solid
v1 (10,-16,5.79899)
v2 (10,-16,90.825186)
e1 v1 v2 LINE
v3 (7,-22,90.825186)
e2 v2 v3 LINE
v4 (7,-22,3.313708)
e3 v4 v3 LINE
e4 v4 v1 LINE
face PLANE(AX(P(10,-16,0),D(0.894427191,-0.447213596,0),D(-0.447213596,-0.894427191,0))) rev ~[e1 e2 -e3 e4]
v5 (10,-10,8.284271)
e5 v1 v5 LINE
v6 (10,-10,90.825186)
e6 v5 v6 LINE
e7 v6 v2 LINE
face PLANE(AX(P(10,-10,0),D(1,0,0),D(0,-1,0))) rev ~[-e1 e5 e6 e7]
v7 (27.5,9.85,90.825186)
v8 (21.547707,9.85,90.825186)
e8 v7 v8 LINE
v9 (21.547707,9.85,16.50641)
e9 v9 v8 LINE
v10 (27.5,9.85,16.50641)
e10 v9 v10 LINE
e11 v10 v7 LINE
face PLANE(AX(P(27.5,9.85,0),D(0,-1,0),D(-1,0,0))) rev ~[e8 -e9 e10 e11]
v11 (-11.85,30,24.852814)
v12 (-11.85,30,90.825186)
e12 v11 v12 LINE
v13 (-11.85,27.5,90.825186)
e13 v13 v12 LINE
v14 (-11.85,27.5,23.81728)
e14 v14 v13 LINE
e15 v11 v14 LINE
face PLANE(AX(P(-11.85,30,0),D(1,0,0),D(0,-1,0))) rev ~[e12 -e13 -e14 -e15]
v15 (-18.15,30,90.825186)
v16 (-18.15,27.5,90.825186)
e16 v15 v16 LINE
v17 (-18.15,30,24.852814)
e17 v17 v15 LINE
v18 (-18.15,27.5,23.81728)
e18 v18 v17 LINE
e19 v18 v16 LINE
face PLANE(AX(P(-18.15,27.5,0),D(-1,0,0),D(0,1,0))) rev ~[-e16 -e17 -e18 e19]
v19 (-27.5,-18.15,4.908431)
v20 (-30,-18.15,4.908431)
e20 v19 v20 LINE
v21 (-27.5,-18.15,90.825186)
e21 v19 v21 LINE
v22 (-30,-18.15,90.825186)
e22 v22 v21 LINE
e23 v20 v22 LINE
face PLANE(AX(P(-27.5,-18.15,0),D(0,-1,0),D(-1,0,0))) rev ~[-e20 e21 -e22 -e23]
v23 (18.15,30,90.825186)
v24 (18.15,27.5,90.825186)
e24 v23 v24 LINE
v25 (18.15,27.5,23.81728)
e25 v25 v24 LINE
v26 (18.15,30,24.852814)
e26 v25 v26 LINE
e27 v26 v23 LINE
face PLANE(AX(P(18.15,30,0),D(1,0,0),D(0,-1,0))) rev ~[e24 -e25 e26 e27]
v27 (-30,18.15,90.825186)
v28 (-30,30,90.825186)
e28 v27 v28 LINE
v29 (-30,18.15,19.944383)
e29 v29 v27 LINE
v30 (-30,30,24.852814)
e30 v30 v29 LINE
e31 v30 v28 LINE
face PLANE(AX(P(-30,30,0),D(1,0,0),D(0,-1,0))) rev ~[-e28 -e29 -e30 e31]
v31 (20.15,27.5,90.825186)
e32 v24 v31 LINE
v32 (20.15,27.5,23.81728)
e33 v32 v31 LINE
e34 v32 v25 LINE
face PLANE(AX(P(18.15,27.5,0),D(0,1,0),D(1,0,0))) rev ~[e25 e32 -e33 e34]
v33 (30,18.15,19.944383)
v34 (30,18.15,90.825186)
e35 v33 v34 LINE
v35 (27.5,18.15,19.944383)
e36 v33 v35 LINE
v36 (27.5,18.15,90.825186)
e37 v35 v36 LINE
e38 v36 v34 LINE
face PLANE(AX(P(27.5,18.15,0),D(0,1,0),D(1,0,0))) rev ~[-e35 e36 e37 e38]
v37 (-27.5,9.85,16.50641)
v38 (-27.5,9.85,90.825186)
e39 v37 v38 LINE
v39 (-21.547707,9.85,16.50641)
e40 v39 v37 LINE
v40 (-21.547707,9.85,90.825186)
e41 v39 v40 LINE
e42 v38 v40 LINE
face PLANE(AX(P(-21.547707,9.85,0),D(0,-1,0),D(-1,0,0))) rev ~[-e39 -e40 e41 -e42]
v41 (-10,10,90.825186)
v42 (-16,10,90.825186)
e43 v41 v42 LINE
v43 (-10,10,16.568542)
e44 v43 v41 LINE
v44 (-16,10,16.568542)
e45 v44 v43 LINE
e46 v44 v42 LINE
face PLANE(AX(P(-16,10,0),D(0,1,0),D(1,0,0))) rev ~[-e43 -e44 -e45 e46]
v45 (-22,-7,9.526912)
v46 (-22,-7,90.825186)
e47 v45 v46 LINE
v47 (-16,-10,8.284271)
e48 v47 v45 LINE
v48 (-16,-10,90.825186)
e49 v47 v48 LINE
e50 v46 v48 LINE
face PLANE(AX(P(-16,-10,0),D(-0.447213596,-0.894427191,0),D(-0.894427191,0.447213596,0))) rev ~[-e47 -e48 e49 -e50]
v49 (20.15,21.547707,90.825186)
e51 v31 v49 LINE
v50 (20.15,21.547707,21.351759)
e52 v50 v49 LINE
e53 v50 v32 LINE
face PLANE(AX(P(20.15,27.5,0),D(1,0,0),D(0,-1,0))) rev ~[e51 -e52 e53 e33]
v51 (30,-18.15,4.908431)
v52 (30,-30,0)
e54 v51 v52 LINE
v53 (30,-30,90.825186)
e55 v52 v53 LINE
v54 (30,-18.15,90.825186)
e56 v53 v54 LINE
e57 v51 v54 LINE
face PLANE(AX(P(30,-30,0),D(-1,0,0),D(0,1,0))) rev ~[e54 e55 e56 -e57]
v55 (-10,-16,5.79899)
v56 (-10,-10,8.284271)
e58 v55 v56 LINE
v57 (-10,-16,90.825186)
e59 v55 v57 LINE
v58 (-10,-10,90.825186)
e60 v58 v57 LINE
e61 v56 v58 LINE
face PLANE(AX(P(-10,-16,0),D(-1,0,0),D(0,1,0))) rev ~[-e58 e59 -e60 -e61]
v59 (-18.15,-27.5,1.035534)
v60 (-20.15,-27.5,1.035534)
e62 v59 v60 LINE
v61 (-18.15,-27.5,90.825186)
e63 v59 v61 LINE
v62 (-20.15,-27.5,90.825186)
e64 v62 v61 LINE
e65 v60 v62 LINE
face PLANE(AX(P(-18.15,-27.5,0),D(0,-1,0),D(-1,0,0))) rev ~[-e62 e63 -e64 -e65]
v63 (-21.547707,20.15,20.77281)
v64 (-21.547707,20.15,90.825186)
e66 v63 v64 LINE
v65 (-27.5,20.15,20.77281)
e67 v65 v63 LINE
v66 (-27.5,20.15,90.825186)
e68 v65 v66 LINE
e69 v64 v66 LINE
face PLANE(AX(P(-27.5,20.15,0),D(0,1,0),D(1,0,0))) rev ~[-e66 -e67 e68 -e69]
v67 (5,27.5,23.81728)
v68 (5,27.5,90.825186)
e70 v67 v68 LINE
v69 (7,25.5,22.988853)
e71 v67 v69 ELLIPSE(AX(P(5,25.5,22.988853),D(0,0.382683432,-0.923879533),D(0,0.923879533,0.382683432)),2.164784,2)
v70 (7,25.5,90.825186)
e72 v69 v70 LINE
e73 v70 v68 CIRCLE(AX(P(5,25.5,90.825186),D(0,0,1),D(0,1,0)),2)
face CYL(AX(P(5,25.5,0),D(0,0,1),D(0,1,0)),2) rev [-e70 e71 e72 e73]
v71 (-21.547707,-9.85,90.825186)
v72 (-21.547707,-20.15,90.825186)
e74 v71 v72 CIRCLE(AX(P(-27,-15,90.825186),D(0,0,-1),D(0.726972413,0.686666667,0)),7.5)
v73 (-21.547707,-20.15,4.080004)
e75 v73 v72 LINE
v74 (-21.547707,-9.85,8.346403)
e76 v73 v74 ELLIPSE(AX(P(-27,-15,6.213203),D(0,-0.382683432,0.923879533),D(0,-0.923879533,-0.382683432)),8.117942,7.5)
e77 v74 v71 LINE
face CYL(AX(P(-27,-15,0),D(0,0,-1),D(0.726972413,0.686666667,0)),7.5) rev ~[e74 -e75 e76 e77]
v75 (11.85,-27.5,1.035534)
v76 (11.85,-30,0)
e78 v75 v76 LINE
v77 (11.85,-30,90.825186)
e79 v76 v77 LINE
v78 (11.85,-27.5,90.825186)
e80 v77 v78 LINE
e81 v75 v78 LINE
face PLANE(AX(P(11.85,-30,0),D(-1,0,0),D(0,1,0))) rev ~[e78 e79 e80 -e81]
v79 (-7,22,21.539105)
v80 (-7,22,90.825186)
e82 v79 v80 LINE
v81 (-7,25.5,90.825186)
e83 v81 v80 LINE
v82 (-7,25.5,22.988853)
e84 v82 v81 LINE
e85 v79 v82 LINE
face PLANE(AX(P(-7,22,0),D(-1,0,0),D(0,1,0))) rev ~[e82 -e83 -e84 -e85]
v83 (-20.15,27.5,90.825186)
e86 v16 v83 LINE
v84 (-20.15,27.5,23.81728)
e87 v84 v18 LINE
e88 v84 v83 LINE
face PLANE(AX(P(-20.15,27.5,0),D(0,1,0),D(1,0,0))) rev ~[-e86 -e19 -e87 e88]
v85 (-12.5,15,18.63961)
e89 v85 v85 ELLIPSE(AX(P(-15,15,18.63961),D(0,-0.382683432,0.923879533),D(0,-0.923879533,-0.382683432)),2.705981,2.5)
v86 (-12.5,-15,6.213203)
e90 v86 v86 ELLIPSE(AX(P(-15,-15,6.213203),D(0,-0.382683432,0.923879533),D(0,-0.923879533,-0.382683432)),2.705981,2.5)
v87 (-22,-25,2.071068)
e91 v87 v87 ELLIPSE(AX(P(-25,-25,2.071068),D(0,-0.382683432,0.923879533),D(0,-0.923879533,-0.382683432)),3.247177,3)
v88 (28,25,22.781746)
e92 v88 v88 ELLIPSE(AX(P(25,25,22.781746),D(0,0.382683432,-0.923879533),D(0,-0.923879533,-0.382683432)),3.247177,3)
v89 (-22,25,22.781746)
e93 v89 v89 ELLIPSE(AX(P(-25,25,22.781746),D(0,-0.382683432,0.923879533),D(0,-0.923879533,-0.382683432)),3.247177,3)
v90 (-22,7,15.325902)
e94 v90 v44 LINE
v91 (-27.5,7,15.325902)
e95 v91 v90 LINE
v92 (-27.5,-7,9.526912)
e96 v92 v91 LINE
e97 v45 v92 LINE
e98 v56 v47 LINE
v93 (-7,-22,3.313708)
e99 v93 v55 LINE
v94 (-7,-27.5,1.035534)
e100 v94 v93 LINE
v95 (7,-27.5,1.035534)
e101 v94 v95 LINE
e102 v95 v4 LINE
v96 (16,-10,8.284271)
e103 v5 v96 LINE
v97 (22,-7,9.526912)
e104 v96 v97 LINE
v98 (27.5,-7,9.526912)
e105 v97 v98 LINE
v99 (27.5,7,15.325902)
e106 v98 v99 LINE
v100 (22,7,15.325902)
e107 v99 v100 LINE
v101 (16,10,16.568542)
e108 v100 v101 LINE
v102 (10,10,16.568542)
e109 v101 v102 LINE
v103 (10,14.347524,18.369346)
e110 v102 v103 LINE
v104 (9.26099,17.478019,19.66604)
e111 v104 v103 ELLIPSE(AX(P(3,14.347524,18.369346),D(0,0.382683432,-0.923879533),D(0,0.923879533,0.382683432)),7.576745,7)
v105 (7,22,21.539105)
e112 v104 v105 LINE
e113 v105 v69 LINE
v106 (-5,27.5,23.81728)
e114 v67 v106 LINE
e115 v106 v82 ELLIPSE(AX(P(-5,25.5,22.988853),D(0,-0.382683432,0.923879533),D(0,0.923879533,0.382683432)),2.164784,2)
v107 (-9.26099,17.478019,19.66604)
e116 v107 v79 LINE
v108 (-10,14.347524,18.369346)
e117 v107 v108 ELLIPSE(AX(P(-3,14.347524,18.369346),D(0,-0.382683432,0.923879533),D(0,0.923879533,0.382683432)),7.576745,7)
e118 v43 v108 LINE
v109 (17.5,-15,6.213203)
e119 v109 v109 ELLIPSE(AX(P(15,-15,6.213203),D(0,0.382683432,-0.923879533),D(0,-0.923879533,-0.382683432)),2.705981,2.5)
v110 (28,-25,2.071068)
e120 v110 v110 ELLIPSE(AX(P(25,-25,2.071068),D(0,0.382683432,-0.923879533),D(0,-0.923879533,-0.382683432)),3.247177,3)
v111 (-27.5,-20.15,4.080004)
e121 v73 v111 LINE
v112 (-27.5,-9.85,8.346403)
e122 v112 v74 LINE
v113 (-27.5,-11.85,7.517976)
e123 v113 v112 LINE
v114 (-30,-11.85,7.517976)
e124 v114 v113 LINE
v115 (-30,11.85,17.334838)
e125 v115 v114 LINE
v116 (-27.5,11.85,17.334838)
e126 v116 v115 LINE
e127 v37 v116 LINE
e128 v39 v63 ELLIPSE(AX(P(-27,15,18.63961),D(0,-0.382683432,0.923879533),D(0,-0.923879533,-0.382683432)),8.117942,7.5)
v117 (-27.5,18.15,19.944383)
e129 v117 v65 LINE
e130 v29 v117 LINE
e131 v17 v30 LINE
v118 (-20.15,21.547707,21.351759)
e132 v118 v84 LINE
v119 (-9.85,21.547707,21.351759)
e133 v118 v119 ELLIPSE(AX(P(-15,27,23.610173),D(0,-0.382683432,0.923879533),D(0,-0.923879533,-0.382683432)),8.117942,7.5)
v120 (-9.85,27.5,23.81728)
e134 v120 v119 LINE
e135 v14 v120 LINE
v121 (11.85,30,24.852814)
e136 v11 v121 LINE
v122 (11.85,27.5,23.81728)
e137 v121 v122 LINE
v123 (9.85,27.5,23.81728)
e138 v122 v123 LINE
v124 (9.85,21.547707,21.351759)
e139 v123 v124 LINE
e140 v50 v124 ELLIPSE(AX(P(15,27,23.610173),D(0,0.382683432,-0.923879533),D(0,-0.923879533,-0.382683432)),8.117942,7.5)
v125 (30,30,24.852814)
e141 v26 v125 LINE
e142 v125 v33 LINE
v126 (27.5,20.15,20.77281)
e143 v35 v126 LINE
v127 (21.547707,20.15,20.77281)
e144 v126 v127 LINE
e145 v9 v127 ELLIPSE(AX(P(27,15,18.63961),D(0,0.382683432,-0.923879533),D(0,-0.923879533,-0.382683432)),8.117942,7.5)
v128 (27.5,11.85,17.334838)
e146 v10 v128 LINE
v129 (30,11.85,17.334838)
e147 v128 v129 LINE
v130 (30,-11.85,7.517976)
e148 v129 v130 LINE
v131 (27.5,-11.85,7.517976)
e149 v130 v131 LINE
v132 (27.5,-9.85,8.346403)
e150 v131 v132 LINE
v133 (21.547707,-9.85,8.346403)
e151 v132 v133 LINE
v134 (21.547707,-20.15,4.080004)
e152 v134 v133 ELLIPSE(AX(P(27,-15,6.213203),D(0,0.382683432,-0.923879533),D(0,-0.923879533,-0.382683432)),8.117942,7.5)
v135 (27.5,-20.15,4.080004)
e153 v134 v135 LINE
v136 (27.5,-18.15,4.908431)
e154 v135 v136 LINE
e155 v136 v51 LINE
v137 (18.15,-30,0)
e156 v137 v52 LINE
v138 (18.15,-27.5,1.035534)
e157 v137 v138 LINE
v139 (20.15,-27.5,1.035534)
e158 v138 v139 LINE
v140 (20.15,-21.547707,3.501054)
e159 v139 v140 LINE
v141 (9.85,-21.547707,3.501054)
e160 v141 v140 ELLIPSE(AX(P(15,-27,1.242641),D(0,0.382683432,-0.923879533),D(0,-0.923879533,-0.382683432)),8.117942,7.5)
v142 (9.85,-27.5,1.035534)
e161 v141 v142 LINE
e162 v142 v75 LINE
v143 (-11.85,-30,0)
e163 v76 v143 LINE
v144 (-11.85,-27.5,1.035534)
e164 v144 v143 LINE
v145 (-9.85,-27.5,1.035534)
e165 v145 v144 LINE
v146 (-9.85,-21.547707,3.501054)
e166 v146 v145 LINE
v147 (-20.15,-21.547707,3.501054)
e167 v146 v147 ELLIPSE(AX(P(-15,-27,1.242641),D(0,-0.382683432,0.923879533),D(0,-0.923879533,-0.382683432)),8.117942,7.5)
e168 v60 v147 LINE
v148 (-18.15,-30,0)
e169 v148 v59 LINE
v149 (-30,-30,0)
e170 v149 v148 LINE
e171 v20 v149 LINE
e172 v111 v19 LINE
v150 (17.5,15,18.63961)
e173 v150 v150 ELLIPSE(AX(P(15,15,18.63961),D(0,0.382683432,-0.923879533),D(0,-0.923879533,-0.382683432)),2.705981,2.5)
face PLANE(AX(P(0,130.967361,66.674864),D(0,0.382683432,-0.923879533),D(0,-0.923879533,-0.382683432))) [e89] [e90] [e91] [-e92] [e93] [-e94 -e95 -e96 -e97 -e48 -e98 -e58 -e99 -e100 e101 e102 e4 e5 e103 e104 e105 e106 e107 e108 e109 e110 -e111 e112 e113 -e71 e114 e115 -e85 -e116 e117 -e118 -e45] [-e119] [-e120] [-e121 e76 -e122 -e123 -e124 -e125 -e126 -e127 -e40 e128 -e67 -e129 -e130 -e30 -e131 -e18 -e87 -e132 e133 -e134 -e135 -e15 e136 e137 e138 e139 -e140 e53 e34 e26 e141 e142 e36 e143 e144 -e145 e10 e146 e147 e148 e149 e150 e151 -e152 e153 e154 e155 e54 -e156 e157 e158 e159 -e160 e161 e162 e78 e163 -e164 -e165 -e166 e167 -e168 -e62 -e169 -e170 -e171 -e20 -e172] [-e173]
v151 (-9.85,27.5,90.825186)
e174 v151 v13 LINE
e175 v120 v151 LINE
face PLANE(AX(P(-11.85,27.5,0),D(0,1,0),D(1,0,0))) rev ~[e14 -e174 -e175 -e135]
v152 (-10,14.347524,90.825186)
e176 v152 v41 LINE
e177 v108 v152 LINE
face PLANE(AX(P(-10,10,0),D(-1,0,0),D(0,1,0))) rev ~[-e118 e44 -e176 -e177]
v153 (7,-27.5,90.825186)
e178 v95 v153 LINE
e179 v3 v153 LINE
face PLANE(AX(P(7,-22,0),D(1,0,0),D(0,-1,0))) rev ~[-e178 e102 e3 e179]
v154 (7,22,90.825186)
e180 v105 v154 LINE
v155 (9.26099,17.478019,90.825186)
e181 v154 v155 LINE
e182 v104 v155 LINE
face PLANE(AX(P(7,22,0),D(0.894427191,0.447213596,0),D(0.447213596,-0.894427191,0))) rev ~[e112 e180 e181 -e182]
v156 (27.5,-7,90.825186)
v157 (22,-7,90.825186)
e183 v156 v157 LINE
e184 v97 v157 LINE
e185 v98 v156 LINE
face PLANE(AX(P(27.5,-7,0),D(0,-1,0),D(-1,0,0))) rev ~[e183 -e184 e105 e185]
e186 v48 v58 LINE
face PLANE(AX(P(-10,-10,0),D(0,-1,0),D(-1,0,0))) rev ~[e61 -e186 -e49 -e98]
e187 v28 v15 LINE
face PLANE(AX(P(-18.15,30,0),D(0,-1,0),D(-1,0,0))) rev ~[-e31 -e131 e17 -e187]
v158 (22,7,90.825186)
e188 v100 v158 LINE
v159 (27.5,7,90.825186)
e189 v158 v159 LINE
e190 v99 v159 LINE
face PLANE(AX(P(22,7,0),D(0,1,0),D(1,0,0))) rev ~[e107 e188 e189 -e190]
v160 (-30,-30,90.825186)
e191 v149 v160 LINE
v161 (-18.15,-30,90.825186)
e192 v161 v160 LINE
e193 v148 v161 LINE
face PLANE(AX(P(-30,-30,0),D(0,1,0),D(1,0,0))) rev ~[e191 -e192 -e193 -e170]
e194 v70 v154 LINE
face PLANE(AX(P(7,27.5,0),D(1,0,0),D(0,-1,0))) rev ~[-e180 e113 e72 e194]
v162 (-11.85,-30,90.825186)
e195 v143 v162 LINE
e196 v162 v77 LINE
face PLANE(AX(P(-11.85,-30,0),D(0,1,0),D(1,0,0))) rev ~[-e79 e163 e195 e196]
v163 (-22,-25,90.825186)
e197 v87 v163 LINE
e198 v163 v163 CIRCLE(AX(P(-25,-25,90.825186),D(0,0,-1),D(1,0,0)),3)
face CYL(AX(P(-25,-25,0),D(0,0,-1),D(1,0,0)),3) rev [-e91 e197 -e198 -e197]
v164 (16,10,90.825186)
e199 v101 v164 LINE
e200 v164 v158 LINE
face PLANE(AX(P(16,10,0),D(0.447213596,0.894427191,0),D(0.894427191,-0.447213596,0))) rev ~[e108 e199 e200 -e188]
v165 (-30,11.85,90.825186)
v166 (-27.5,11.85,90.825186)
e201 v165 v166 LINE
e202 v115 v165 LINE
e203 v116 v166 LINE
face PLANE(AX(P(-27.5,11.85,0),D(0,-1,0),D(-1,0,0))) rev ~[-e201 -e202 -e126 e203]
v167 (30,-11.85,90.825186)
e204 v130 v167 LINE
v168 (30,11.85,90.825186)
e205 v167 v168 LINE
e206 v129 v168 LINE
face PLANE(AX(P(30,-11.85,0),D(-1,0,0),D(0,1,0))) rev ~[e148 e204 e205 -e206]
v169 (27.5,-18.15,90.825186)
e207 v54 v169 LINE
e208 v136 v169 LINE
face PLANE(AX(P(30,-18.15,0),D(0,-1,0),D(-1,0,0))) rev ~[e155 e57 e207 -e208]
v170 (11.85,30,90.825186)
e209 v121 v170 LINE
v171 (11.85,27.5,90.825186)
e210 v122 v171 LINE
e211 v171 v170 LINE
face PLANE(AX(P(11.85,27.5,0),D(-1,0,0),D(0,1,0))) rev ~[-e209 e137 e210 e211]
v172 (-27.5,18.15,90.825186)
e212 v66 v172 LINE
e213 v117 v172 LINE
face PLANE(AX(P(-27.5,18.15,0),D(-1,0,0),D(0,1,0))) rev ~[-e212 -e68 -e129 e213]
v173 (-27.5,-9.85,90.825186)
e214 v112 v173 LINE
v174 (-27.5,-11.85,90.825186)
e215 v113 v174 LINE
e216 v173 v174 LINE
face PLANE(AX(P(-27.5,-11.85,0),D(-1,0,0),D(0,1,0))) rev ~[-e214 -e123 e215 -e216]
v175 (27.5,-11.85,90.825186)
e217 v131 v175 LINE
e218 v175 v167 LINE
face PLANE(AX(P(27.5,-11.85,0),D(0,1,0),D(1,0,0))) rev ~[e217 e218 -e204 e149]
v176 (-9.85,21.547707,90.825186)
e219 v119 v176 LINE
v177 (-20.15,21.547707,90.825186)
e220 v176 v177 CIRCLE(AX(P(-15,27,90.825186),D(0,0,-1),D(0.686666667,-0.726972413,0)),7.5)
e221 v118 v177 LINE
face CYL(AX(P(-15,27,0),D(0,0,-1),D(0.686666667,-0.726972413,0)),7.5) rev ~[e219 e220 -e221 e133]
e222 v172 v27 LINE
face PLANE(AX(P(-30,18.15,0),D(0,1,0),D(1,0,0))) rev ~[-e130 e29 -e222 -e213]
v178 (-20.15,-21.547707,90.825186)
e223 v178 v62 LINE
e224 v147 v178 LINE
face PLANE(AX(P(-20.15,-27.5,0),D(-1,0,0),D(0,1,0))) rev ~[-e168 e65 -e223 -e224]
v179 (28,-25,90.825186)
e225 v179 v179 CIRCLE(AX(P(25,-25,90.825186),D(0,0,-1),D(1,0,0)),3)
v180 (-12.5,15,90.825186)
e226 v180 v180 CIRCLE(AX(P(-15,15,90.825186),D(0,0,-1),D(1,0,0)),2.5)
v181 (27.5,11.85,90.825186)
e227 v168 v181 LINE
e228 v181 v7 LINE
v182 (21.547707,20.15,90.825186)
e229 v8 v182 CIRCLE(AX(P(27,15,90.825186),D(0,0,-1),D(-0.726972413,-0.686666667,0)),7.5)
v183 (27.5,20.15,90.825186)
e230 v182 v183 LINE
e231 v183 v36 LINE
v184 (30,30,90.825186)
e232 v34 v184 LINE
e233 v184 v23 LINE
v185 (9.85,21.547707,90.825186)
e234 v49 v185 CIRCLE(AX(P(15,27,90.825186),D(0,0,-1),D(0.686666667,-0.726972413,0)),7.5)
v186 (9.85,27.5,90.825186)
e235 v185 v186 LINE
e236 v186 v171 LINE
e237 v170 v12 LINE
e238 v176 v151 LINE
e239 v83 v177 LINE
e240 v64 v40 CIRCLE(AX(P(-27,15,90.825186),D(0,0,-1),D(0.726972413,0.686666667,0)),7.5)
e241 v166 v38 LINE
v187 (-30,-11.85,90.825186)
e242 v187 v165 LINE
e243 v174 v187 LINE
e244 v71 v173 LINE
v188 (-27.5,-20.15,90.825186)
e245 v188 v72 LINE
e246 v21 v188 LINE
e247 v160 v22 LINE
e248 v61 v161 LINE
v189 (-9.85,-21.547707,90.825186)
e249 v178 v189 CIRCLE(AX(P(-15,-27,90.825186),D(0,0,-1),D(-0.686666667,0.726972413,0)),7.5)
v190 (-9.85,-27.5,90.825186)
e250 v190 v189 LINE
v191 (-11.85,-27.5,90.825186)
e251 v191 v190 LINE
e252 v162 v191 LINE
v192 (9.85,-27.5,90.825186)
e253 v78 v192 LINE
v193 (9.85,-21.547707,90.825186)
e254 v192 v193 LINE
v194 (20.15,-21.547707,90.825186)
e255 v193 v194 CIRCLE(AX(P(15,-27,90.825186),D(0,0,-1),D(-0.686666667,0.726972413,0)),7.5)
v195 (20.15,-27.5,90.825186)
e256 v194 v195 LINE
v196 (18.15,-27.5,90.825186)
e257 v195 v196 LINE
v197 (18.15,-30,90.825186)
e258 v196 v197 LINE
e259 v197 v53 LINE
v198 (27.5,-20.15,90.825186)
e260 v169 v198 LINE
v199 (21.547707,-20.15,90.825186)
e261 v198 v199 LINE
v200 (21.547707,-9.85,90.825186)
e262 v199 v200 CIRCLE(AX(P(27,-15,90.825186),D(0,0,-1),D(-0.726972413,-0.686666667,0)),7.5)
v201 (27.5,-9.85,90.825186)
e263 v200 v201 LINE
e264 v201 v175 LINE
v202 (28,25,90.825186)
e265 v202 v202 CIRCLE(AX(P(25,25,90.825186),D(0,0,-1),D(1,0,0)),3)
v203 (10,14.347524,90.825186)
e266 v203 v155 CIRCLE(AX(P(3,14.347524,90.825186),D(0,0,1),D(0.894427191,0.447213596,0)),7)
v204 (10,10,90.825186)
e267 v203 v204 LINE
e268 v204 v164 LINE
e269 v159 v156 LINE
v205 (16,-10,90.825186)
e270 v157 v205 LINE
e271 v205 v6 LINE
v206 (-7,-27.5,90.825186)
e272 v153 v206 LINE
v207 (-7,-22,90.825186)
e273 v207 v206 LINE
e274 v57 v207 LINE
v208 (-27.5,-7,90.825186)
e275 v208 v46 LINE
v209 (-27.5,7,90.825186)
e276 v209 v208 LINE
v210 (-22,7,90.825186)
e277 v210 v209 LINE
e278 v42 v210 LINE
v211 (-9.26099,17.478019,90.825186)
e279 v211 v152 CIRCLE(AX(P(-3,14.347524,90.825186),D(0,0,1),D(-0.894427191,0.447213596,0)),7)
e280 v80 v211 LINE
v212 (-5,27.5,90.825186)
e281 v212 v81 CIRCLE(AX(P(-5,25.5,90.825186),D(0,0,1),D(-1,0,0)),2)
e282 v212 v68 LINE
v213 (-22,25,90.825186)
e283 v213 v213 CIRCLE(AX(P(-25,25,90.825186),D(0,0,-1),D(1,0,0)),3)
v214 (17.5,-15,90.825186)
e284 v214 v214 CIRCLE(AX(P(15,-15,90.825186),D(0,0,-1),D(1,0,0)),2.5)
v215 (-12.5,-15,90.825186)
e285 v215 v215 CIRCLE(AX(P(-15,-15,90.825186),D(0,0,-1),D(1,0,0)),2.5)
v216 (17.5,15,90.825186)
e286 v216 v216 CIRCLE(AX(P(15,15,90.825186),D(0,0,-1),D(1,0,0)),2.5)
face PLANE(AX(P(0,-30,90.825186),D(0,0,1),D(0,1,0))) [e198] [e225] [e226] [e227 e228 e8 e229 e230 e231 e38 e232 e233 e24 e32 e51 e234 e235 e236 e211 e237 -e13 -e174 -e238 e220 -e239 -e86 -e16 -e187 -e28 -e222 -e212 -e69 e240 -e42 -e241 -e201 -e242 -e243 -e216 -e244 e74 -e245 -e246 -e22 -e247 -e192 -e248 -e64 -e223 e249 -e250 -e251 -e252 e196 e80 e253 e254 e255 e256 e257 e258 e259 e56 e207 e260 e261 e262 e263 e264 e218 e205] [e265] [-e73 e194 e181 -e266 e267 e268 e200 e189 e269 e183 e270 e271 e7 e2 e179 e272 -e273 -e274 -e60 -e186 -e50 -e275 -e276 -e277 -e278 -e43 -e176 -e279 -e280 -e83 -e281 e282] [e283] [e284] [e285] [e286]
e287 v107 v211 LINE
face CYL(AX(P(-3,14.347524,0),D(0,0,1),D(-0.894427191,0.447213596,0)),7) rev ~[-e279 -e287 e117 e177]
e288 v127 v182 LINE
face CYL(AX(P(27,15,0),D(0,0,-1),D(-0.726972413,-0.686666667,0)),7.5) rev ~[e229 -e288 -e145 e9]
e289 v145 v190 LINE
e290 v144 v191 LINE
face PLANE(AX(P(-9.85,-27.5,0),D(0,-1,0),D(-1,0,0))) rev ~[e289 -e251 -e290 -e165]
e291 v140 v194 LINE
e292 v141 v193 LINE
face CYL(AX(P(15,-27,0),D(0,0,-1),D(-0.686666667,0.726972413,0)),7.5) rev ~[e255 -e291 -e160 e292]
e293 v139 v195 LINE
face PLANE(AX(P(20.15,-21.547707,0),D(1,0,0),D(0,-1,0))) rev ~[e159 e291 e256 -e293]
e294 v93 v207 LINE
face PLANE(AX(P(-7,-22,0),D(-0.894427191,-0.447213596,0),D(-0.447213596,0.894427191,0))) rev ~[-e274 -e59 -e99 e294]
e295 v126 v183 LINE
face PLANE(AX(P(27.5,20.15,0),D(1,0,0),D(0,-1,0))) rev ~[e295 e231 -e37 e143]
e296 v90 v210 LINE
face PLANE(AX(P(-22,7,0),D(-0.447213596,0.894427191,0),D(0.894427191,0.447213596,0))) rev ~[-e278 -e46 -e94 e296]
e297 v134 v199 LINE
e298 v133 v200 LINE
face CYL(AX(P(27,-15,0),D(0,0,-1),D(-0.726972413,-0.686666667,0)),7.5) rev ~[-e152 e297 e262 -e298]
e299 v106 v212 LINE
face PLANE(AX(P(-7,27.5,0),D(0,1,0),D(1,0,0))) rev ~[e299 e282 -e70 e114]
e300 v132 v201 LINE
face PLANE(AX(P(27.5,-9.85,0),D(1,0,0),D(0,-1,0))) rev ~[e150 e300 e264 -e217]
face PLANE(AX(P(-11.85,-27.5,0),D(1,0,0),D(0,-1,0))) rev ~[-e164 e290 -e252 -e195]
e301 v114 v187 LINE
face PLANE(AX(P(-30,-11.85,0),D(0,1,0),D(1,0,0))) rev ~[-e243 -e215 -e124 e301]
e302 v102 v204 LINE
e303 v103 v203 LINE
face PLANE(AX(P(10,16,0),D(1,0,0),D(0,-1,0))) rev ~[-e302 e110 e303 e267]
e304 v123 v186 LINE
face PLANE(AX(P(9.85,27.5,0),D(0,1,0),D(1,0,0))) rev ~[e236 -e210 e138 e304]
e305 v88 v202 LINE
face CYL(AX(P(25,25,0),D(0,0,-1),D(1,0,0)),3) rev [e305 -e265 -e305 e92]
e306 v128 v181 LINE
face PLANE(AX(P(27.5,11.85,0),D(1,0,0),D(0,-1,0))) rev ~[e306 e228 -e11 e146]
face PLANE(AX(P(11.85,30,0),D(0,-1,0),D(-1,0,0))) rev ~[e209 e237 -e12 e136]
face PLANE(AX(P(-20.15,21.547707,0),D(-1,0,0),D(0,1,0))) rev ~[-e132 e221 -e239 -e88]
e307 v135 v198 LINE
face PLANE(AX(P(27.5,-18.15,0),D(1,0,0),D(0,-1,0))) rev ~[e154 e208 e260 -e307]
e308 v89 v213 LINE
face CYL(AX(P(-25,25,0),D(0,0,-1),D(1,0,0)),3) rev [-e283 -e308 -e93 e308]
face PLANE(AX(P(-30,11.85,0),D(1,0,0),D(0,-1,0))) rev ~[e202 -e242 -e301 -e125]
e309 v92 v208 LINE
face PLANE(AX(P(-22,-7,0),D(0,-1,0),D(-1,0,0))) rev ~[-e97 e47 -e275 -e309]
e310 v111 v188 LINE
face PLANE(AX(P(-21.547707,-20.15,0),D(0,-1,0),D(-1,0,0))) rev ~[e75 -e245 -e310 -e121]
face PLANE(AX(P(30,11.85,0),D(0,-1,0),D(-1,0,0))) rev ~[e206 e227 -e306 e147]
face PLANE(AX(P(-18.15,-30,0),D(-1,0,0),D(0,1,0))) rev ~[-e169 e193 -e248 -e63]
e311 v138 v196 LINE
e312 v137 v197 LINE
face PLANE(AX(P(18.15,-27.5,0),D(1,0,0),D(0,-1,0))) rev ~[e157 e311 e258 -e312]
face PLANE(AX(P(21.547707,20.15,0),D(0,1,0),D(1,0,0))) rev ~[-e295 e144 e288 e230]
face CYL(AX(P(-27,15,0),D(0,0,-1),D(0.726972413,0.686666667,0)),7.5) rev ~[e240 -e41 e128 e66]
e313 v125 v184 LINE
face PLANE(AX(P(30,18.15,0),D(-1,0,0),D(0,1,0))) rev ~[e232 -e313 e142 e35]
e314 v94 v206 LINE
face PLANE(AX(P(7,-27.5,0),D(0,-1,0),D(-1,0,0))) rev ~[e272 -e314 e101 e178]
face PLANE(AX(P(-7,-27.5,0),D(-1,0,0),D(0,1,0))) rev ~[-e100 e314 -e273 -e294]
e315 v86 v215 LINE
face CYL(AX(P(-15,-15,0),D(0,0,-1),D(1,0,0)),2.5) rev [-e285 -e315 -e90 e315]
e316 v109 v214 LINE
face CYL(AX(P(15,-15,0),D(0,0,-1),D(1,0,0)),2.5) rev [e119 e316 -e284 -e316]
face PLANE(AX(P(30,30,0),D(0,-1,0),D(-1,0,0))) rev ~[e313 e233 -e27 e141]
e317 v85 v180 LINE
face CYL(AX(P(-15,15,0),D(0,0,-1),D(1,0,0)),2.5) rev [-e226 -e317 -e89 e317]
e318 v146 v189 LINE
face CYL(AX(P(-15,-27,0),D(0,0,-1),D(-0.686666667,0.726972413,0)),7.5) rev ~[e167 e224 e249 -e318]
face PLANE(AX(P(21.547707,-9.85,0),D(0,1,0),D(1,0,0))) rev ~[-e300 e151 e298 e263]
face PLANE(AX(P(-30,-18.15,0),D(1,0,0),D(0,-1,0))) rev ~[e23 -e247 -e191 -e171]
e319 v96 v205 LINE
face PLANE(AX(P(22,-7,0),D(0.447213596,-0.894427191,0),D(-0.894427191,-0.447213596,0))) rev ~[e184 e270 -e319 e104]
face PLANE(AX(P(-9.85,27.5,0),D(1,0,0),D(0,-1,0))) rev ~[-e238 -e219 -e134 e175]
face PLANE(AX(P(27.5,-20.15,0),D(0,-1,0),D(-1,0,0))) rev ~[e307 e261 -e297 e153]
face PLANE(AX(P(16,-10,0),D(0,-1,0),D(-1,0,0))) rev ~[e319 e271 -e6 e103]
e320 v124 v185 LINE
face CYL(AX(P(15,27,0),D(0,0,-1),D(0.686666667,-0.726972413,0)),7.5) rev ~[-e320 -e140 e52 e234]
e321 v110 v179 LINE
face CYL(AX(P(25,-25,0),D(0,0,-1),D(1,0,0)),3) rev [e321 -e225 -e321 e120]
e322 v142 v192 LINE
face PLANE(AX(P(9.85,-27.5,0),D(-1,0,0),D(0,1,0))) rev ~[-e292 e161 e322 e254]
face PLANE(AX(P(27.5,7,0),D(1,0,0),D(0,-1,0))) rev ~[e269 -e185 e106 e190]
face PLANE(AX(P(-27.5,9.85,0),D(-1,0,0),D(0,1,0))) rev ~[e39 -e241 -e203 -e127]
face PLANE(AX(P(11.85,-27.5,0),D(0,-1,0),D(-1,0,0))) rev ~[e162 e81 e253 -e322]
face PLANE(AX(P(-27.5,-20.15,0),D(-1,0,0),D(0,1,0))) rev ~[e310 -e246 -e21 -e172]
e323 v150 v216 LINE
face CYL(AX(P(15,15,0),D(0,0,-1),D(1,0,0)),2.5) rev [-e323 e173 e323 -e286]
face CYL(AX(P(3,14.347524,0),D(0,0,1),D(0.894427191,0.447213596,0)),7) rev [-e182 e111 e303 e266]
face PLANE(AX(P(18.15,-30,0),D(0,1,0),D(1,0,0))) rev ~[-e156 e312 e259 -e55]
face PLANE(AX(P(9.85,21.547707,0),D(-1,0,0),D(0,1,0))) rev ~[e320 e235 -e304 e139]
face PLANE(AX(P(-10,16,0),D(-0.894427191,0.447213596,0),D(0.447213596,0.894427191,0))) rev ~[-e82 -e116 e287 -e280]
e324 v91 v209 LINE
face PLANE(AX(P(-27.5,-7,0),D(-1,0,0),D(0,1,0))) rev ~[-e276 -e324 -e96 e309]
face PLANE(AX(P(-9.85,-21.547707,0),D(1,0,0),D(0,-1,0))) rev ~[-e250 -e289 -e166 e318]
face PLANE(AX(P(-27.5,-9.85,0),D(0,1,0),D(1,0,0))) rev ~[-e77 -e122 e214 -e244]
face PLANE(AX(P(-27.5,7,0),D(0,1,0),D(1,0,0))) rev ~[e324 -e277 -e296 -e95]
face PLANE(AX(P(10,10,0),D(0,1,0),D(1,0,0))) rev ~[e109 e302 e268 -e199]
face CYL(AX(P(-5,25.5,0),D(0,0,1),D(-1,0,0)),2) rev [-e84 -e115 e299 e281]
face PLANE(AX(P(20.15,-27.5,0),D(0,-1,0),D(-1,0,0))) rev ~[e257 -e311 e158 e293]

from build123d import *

# Parameters (mm, degrees)
F0_R          = 3
F0_R_2        = 2.5
F1_DEPTH      = 115.678
F2_R          = 2
F3_R          = 7
F6_DEPTH      = 30
F6_DEPTH_BACK = 30
F7_W          = 131.1645284295
F7_H          = 50.7057756186
F8_DEPTH      = 30
F8_DEPTH_BACK = 30


# Not quite as in the source:
# - a feature names something its author has since deleted; it is built from what else it names


with BuildPart() as f1:
    # F0 (on Top) → F1 (new body)
    with BuildSketch(Plane.XY):
        with BuildLine():
            Line((18.15, -30), (30, -30))
            Line((30, -30), (30, -18.15))
            Line((30, -18.15), (27.5, -18.15))
            Line((27.5, -18.15), (27.5, -20.15))
            Line((27.5, -20.15), (21.5477069044, -20.15))
            ThreePointArc((21.5477069044, -20.15), (19.5, -15), (21.5477069044, -9.85))
            Line((21.5477069044, -9.85), (27.5, -9.85))
            Line((27.5, -9.85), (27.5, -11.85))
            Line((27.5, -11.85), (30, -11.85))
            Line((30, -11.85), (30, 11.85))
            Line((30, 11.85), (27.5, 11.85))
            Line((27.5, 11.85), (27.5, 9.85))
            Line((27.5, 9.85), (21.5477069044, 9.85))
            ThreePointArc((21.5477069044, 9.85), (19.5, 15), (21.5477069044, 20.15))
            Line((21.5477069044, 20.15), (27.5, 20.15))
            Line((27.5, 20.15), (27.5, 18.15))
            Line((27.5, 18.15), (30, 18.15))
            Line((30, 18.15), (30, 30))
            Line((30, 30), (18.15, 30))
            Line((18.15, 30), (18.15, 27.5))
            Line((18.15, 27.5), (20.15, 27.5))
            Line((20.15, 27.5), (20.15, 21.5477069044))
            ThreePointArc((20.15, 21.5477069044), (15, 19.5), (9.85, 21.5477069044))
            Line((9.85, 21.5477069044), (9.85, 27.5))
            Line((9.85, 27.5), (11.85, 27.5))
            Line((11.85, 27.5), (11.85, 30))
            Line((11.85, 30), (-11.85, 30))
            Line((-11.85, 30), (-11.85, 27.5))
            Line((-11.85, 27.5), (-9.85, 27.5))
            Line((-9.85, 27.5), (-9.85, 21.5477069044))
            ThreePointArc((-9.85, 21.5477069044), (-15, 19.5), (-20.15, 21.5477069044))
            Line((-20.15, 21.5477069044), (-20.15, 27.5))
            Line((-20.15, 27.5), (-18.15, 27.5))
            Line((-18.15, 27.5), (-18.15, 30))
            Line((-18.15, 30), (-30, 30))
            Line((-30, 30), (-30, 18.15))
            Line((-30, 18.15), (-27.5, 18.15))
            Line((-27.5, 18.15), (-27.5, 20.15))
            Line((-27.5, 20.15), (-21.5477069044, 20.15))
            ThreePointArc((-21.5477069044, 20.15), (-19.5, 15), (-21.5477069044, 9.85))
            Line((-21.5477069044, 9.85), (-27.5, 9.85))
            Line((-27.5, 9.85), (-27.5, 11.85))
            Line((-27.5, 11.85), (-30, 11.85))
            Line((-30, 11.85), (-30, -11.85))
            Line((-30, -11.85), (-27.5, -11.85))
            Line((-27.5, -11.85), (-27.5, -9.85))
            Line((-27.5, -9.85), (-21.5477069044, -9.85))
            ThreePointArc((-21.5477069044, -9.85), (-19.5, -15), (-21.5477069044, -20.15))
            Line((-21.5477069044, -20.15), (-27.5, -20.15))
            Line((-27.5, -20.15), (-27.5, -18.15))
            Line((-27.5, -18.15), (-30, -18.15))
            Line((-30, -18.15), (-30, -30))
            Line((-30, -30), (-18.15, -30))
            Line((-18.15, -30), (-18.15, -27.5))
            Line((-18.15, -27.5), (-20.15, -27.5))
            Line((-20.15, -27.5), (-20.15, -21.5477069044))
            ThreePointArc((-20.15, -21.5477069044), (-15, -19.5), (-9.85, -21.5477069044))
            Line((-9.85, -21.5477069044), (-9.85, -27.5))
            Line((-9.85, -27.5), (-11.85, -27.5))
            Line((-11.85, -27.5), (-11.85, -30))
            Line((-11.85, -30), (11.85, -30))
            Line((11.85, -30), (11.85, -27.5))
            Line((11.85, -27.5), (9.85, -27.5))
            Line((9.85, -27.5), (9.85, -21.5477069044))
            ThreePointArc((9.85, -21.5477069044), (15, -19.5), (20.15, -21.5477069044))
            Line((20.15, -21.5477069044), (20.15, -27.5))
            Line((20.15, -27.5), (18.15, -27.5))
            Line((18.15, -27.5), (18.15, -30))
        make_face()
        with Locations((-25, -25)):
            Circle(F0_R, mode=Mode.SUBTRACT)
        with Locations((-15, -15)):
            Circle(F0_R_2, mode=Mode.SUBTRACT)
        with Locations((25, -25)):
            Circle(F0_R, mode=Mode.SUBTRACT)
        with Locations((15, -15)):
            Circle(F0_R_2, mode=Mode.SUBTRACT)
        with Locations((-25, 25)):
            Circle(F0_R, mode=Mode.SUBTRACT)
        with Locations((-15, 15)):
            Circle(F0_R_2, mode=Mode.SUBTRACT)
        Polygon((-7, 22), (-7, 27.5), (0, 27.5), (7, 27.5), (7, 22), (10, 16), (10, 10), (16, 10), (22, 7), (27.5, 7), (27.5, 0), (27.5, -7), (22, -7), (16, -10), (10, -10), (10, -16), (7, -22), (7, -27.5), (0, -27.5), (-7, -27.5), (-7, -22), (-10, -16), (-10, -10), (-16, -10), (-22, -7), (-27.5, -7), (-27.5, 0), (-27.5, 7), (-22, 7), (-16, 10), (-10, 10), (-10, 16), align=None, mode=Mode.SUBTRACT)
        with Locations((15, 15)):
            Circle(F0_R_2, mode=Mode.SUBTRACT)
        with Locations((25, 25)):
            Circle(F0_R, mode=Mode.SUBTRACT)
    extrude(amount=F1_DEPTH)

    # F2
    f2_edges = [f1.edges().sort_by_distance(p)[0] for p in [
        (-7, 27.5, 57.839),
        (7, 27.5, 57.839),
    ]]
    fillet(f2_edges, radius=F2_R)

    # F3
    f3_edges = [f1.edges().sort_by_distance(p)[0] for p in [
        (-10, 16, 57.839),
        (10, 16, 57.839),
    ]]
    fillet(f3_edges, radius=F3_R)

    # F5 (on Right) → F6 (cut, two sides)
    with BuildSketch(Plane.YZ) as f6_sk:
        Polygon((214.5999793503, -135.2321386172), (130.9673605882, 66.674863855), (-30, 0), (53.6326187621, -201.9070024722), align=None)
        Polygon((30, 115.678), (-2.0081647111, 192.9525453523), (-162.3392477394, 126.541236292), (-130.3310830283, 49.2666909397), align=None)
    extrude(amount=-F6_DEPTH, mode=Mode.SUBTRACT)
    extrude(f6_sk.sketch, amount=F6_DEPTH_BACK, mode=Mode.SUBTRACT)

    # F7 (on Right) → F8 (cut, two sides)
    with BuildSketch(Plane.YZ) as f8_sk:
        with Locations((35.5822642148, 116.1780740669)):
            Rectangle(F7_W, F7_H)
    extrude(amount=F8_DEPTH, mode=Mode.SUBTRACT)
    extrude(f8_sk.sketch, amount=-F8_DEPTH_BACK, mode=Mode.SUBTRACT)


solid = f1.part
